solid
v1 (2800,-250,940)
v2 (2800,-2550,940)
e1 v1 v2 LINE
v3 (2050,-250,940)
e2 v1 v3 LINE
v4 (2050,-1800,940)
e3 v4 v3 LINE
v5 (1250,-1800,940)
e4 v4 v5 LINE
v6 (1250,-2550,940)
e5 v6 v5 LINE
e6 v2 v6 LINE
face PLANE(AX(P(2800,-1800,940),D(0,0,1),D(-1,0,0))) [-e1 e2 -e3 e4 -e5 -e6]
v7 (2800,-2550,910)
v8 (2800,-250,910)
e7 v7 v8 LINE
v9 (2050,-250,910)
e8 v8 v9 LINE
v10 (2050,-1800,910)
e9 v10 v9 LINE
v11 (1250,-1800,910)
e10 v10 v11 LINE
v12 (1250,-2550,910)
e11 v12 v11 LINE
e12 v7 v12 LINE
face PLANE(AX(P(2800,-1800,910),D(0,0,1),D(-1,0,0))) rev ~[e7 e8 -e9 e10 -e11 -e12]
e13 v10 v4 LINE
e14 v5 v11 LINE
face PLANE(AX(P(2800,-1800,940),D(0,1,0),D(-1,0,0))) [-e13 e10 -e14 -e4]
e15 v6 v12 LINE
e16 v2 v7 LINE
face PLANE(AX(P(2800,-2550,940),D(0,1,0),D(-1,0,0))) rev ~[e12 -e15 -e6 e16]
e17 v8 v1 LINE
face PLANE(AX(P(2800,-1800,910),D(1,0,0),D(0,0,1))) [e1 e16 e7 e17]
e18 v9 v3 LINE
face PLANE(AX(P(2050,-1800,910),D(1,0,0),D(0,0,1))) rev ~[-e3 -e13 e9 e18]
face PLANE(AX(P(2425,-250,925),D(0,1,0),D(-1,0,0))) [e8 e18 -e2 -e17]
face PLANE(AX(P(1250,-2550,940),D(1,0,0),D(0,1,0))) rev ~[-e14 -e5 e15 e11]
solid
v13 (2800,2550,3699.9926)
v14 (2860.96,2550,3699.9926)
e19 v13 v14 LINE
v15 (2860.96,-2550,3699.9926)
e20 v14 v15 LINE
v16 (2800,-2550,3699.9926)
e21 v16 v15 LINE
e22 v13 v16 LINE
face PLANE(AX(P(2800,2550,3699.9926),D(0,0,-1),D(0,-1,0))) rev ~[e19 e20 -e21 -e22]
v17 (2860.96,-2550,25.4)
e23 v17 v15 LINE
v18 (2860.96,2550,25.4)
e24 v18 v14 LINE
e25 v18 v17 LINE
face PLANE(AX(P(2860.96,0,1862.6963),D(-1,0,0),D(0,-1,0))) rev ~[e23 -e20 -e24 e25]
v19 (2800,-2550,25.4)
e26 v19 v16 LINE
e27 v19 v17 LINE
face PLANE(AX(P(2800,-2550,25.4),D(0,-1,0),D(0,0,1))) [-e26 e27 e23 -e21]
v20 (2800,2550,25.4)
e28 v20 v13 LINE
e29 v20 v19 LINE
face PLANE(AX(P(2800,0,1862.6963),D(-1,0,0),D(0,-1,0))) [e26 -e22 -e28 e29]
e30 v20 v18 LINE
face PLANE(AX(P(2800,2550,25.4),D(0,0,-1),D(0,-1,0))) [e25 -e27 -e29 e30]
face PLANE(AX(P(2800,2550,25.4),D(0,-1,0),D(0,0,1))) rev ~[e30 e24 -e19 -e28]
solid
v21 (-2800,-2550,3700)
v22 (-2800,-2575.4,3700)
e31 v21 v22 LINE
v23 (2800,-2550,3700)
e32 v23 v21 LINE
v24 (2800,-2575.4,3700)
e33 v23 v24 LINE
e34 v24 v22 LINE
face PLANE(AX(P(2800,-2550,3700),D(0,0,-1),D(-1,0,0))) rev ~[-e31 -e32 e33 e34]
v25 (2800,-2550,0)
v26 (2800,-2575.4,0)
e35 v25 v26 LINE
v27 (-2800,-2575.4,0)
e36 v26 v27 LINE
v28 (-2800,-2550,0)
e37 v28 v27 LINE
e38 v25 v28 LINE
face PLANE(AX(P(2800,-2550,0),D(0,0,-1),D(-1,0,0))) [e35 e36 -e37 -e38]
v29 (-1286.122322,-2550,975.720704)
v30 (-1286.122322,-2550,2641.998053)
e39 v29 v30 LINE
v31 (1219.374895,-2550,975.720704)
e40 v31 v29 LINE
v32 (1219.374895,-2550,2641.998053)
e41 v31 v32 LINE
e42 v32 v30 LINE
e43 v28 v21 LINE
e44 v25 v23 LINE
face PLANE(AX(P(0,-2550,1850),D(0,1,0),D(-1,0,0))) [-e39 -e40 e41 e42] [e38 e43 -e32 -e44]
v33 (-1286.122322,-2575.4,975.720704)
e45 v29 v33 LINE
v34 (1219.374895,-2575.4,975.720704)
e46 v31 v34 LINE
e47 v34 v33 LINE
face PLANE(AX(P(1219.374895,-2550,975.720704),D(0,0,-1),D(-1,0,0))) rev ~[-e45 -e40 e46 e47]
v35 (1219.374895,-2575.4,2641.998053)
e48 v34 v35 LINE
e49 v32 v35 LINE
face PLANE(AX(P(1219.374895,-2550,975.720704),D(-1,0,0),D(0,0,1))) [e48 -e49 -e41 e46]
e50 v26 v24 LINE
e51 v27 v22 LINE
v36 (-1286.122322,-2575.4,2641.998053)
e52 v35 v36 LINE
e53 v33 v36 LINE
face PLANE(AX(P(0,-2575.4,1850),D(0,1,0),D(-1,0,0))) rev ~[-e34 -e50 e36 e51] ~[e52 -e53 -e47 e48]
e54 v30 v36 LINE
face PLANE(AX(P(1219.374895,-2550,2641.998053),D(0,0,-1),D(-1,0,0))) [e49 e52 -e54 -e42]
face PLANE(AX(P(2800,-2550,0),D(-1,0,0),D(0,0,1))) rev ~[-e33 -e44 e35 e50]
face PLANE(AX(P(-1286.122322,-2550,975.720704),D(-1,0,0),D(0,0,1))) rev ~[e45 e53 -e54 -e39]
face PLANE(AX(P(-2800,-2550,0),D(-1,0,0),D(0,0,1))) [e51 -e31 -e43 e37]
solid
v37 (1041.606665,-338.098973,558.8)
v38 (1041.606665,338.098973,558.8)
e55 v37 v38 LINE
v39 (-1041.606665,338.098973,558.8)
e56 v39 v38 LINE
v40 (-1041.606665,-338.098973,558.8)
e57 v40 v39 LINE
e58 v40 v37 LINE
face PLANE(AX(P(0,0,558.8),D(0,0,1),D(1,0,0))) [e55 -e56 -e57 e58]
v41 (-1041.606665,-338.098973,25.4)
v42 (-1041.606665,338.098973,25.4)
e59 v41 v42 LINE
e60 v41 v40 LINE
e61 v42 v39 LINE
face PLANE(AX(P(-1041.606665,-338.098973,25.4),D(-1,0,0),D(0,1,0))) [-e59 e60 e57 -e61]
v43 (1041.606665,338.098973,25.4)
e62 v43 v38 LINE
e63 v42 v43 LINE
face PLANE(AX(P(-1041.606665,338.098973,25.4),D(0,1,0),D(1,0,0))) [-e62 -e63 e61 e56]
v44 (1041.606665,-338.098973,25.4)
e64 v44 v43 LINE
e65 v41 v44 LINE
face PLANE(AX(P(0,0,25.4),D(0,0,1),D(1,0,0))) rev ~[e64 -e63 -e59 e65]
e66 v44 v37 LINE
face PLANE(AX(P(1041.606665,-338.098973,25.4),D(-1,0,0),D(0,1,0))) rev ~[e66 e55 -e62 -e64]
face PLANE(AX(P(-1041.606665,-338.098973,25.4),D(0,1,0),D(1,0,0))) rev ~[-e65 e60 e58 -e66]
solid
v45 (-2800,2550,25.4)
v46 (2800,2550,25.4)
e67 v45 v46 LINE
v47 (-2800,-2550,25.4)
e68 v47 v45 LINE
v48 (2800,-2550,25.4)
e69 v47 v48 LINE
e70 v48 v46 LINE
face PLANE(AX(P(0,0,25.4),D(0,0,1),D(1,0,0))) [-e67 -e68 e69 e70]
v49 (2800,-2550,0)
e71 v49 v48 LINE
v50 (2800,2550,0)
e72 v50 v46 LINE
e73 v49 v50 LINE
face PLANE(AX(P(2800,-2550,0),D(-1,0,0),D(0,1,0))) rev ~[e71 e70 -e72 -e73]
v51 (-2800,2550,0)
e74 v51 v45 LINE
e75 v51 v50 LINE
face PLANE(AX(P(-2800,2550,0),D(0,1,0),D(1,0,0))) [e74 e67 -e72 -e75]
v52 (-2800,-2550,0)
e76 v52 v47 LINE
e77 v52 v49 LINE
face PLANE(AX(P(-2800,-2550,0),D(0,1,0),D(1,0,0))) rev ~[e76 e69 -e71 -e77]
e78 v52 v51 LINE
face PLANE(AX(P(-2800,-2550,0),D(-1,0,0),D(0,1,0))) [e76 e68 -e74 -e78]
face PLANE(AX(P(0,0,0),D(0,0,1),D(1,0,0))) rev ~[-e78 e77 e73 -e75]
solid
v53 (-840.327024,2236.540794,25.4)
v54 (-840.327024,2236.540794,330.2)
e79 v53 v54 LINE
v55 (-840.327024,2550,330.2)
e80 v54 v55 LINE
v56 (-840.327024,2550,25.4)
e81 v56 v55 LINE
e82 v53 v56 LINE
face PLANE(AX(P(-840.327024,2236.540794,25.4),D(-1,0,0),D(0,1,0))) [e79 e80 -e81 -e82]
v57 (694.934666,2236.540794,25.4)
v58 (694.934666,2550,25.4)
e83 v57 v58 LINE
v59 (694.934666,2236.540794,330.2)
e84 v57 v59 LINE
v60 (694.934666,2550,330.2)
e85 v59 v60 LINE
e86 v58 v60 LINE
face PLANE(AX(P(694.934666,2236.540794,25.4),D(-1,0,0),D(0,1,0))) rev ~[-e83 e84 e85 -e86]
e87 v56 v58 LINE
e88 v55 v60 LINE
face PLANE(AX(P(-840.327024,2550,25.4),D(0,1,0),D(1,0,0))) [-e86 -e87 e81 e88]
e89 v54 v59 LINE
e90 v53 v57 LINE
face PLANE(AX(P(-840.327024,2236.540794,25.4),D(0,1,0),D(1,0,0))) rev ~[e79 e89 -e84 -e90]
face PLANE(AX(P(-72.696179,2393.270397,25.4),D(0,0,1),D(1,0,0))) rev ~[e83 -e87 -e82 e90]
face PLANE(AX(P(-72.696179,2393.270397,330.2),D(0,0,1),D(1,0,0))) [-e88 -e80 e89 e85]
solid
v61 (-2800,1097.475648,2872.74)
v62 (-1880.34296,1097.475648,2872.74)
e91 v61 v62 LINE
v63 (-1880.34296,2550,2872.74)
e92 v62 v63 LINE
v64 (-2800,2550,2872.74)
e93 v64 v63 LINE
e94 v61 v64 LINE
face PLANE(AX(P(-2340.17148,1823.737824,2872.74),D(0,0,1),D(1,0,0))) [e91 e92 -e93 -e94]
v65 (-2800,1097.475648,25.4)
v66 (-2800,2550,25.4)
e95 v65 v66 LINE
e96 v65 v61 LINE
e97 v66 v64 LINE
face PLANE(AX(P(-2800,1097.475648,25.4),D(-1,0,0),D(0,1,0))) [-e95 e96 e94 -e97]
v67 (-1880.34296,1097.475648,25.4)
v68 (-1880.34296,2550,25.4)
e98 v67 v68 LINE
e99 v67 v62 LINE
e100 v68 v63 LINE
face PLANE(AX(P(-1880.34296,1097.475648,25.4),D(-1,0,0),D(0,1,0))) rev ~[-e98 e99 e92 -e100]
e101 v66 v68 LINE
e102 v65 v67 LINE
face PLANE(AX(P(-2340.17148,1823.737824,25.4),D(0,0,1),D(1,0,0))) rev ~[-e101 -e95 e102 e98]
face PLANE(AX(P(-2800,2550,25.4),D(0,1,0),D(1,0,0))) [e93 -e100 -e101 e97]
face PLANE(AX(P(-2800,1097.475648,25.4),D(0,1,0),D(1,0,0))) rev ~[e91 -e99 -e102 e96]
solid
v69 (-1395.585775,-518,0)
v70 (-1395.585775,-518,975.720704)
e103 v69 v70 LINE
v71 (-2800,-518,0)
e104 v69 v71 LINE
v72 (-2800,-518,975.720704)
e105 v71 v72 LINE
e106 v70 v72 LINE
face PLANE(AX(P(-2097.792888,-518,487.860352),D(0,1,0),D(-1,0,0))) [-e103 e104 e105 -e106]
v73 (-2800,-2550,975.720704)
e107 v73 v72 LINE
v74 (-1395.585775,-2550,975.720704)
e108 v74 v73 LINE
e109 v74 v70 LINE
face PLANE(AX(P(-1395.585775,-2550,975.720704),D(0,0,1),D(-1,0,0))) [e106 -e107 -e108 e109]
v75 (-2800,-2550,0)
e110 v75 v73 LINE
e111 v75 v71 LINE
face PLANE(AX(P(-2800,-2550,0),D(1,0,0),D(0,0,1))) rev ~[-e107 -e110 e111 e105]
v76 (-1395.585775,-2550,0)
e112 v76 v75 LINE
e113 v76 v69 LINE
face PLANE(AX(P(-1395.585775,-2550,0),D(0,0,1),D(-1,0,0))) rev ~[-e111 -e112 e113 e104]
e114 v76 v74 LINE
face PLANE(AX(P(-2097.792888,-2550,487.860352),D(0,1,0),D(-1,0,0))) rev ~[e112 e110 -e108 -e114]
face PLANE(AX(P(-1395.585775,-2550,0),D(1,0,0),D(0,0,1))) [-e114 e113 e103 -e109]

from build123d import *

# Parameters (mm, degrees)
F0_W        = 5600
F0_H        = 5100
F2_DEPTH    = 25.4
F6_E3_W     = 1550
F6_E3_H     = 750
F7_DEPTH    = 30
F8_W        = 750
F8_H        = 30
F9_DEPTH    = 1550
F1_E0_TOP_W = 5600
F1_E0_TOP_H = 3700
F10_DEPTH   = 25.4
F4_E1_W     = 5100
F4_E1_H     = 3674.5926
F11_DEPTH   = 60.96
F12_W       = 2505.4972171783
F12_H       = 1666.2773489952
F13_DEPTH   = 330.2
F14_W       = 1404.4142246246
F14_H       = 975.7207036018
F15_DEPTH   = 2032
F16_W       = 919.6570396423
F16_H       = 1452.5243520737
F17_DEPTH   = 2847.34
F18_W       = 2083.2133293152
F18_H       = 676.1979460716
F19_DEPTH   = 533.4
F20_W       = 1535.2616906166
F20_H       = 313.4592056274
F21_DEPTH   = 304.8


with BuildPart() as f2:
    # F0 (on Top) → F2 (new body)
    with BuildSketch(Plane.XY):
        Rectangle(F0_W, F0_H)
    extrude(amount=F2_DEPTH)


with BuildPart() as f7:
    # F6_E3 (on explicit) → F7 (new body)
    with BuildSketch(Plane(origin=(2800, -2550, 940), x_dir=(-1, 0, 0), z_dir=(0, 0, -1))):
        with Locations((775, 375)):
            Rectangle(F6_E3_W, F6_E3_H)
    extrude(amount=F7_DEPTH)

    # F8 (on face) → F9 (join)
    with BuildSketch(Plane(origin=(0, -1800, 0), x_dir=(-1, 0, 0), z_dir=(0, 1, 0))):
        with Locations((-2425, 925)):
            Rectangle(F8_W, F8_H)
    extrude(amount=F9_DEPTH)


with BuildPart() as f10:
    # F1_E0_top (on explicit) → F10 (new body)
    with BuildSketch(Plane(origin=(2800, -2550, 0), x_dir=(-1, 0, 0), z_dir=(0, 1, 0))):
        with Locations((2800, 1850)):
            Rectangle(F1_E0_TOP_W, F1_E0_TOP_H)
    extrude(amount=-F10_DEPTH)

    # F12 (on face) → F13 (cut)
    with BuildSketch(Plane(origin=(0, -2550, 0), x_dir=(-1, 0, 0), z_dir=(0, 1, 0))):
        with Locations((33.3737134933, 1808.8593780994)):
            Rectangle(F12_W, F12_H)
    extrude(amount=-F13_DEPTH, mode=Mode.SUBTRACT)


with BuildPart() as f11:
    # F4_E1 (on explicit) → F11 (new body)
    with BuildSketch(Plane(origin=(2800, 2550, 25.4), x_dir=(0, -1, 0), z_dir=(-1, 0, 0))):
        with Locations((2550, 1837.2963)):
            Rectangle(F4_E1_W, F4_E1_H)
    extrude(amount=-F11_DEPTH)


with BuildPart() as f15:
    # F14 (on face) → F15 (new body)
    with BuildSketch(Plane(origin=(0, -2550, 0), x_dir=(-1, 0, 0), z_dir=(0, 1, 0))):
        with Locations((2097.7928876877, 487.8603518009)):
            Rectangle(F14_W, F14_H)
    extrude(amount=F15_DEPTH)


with BuildPart() as f17:
    # F16 (on face) → F17 (new body)
    with BuildSketch(Plane.XY.offset(25.4)):
        with Locations((-2340.1714801788, 1823.7378239632)):
            Rectangle(F16_W, F16_H)
    extrude(amount=F17_DEPTH)


with BuildPart() as f19:
    # F18 (on face) → F19 (new body)
    with BuildSketch(Plane.XY.offset(25.4)):
        Rectangle(F18_W, F18_H)
    extrude(amount=F19_DEPTH)


with BuildPart() as f21:
    # F20 (on face) → F21 (new body)
    with BuildSketch(Plane.XY.offset(25.4)):
        with Locations((-72.6961791515, 2393.2703971863)):
            Rectangle(F20_W, F20_H)
    extrude(amount=F21_DEPTH)


solid = Compound([f2.part, f7.part, f10.part, f11.part, f15.part, f17.part, f19.part, f21.part])
